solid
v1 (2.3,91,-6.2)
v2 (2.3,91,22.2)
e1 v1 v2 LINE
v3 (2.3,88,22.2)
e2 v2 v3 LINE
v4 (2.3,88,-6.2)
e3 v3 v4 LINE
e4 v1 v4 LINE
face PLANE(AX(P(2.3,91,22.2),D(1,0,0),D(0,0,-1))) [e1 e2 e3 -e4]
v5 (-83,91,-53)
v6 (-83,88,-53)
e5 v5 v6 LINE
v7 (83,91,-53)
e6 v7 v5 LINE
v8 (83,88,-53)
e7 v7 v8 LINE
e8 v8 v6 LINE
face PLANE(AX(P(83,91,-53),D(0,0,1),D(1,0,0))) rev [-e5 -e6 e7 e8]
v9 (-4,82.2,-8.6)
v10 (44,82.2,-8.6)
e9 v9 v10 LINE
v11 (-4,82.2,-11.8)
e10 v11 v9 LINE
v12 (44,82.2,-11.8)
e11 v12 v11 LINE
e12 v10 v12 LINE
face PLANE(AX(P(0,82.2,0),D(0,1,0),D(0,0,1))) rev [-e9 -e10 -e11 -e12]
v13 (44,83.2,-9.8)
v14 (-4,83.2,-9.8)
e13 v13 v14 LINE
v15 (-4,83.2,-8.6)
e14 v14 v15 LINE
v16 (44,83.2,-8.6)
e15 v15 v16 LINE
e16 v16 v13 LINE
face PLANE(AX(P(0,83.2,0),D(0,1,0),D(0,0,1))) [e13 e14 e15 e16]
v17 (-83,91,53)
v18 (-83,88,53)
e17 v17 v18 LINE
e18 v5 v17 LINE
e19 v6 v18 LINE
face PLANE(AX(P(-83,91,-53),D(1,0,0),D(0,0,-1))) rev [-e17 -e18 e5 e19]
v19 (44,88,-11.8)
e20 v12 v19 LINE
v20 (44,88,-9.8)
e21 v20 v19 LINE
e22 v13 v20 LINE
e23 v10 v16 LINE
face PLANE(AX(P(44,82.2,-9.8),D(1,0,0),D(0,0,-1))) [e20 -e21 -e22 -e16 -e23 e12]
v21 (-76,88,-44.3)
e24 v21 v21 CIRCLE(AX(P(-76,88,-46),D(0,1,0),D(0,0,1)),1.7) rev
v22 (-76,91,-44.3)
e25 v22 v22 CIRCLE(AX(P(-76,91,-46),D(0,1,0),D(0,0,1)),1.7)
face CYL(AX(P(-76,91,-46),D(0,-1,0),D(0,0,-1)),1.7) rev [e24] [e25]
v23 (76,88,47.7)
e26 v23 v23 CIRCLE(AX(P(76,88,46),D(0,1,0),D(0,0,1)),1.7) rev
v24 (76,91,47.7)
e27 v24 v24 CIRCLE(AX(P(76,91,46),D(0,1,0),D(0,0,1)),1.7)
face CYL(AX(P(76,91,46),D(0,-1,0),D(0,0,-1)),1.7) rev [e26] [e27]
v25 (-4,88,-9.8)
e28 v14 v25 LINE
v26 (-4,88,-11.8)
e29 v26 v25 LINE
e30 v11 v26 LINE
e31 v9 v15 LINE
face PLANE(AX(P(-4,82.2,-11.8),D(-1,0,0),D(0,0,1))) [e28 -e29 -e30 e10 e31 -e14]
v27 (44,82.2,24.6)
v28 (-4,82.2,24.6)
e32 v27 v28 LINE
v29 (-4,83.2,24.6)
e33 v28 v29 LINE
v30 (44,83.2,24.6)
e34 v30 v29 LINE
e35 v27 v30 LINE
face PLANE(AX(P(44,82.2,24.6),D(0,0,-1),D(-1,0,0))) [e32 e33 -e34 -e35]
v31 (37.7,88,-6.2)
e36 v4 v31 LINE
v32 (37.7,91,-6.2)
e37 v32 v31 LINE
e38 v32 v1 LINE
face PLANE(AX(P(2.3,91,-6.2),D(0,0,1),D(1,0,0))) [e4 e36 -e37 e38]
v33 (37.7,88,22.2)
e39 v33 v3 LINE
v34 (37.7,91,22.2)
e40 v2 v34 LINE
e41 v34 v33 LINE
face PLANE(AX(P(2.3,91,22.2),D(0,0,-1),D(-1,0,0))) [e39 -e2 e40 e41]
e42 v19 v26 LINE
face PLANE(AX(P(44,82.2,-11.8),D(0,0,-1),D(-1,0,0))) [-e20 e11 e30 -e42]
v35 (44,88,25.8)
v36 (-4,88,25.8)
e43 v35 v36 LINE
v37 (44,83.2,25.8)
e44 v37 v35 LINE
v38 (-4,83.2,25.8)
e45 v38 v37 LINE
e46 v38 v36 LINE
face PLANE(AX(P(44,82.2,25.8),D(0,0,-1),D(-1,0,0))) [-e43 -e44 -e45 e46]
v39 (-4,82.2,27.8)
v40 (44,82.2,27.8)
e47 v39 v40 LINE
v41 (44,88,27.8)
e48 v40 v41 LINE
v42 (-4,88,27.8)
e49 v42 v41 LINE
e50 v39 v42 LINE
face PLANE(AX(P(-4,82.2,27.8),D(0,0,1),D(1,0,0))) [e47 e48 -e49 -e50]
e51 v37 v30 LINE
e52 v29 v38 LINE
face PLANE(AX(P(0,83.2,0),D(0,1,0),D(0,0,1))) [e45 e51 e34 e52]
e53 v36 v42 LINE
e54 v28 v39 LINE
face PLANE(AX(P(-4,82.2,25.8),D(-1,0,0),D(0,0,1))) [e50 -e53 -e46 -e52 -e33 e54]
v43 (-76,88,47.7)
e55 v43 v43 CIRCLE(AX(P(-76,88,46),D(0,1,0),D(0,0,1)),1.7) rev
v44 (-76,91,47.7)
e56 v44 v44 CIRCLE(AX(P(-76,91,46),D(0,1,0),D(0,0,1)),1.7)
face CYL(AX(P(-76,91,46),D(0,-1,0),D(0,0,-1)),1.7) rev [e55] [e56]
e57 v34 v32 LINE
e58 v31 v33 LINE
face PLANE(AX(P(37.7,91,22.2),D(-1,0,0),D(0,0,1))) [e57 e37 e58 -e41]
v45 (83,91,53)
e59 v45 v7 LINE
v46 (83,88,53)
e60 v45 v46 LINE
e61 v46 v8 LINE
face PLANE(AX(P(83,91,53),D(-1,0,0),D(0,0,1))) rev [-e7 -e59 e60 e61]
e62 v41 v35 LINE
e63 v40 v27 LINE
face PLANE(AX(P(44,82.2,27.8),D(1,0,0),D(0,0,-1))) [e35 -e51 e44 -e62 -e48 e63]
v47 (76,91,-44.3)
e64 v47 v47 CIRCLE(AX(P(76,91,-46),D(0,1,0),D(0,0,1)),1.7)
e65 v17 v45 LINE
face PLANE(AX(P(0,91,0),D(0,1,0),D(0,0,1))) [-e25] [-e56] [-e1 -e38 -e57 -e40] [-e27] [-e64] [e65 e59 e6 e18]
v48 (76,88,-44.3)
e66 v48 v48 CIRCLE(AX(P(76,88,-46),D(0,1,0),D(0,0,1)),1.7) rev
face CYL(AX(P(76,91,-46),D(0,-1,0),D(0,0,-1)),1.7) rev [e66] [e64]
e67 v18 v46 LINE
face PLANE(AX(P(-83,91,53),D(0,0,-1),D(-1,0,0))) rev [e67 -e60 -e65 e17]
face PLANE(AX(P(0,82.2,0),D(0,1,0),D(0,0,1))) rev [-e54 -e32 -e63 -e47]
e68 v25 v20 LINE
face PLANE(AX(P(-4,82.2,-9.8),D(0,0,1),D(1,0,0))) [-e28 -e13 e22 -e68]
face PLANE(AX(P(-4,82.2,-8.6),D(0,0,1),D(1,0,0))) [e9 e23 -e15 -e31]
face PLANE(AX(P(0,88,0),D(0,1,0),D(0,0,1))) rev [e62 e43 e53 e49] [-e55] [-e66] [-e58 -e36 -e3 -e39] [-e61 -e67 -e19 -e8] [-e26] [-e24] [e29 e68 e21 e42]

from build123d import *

# Parameters (mm, degrees)
LID_PLATE_START               = 88
SKETCH1_W                     = 166
SKETCH1_H                     = 106
LID_PLATE_DEPTH               = 3
TFT_WINDOW_DEPTH              = 135.085793431
TFT_WINDOW_DEPTH_BACK         = 135.085793431
SKETCH2_W                     = 35.4
SKETCH2_H                     = 28.4
LID_SCREW_HOLES_M3_DEPTH      = 135.085793431
LID_SCREW_HOLES_M3_DEPTH_BACK = 135.085793431
SKETCH3_R                     = 1.7
TFT_RAILS_START               = 88
SKETCH4_W                     = 48
SKETCH4_H                     = 2
TFT_RAILS_DEPTH               = 5.8
TFT_RAIL_LIPS_START           = 83.2
SKETCH5_W                     = 48
SKETCH5_H                     = 1.2
TFT_RAIL_LIPS_DEPTH           = 1


with BuildPart() as part:
    # Sketch1 → Lid_Plate (new body)
    with BuildSketch(Plane(origin=(0, 0, 0), x_dir=(1, 0, 0), z_dir=(0, 1, 0)).offset(LID_PLATE_START)):
        Rectangle(SKETCH1_W, SKETCH1_H)
    extrude(amount=LID_PLATE_DEPTH)

    # Sketch2 → TFT_Window (cut, two sides: drawn at the far end of the back side and taken through both)
    with BuildSketch(Plane(origin=(0, 0, 0), x_dir=(1, 0, 0), z_dir=(0, 1, 0)).offset(-TFT_WINDOW_DEPTH_BACK)):
        with Locations((20, -8)):
            Rectangle(SKETCH2_W, SKETCH2_H)
    extrude(amount=TFT_WINDOW_DEPTH + TFT_WINDOW_DEPTH_BACK, mode=Mode.SUBTRACT)

    # Sketch3 → Lid_Screw_Holes_M3 (cut, two sides: drawn at the far end of the back side and taken through both)
    with BuildSketch(Plane(origin=(0, 0, 0), x_dir=(1, 0, 0), z_dir=(0, 1, 0)).offset(-LID_SCREW_HOLES_M3_DEPTH_BACK)):
        with Locations((-76, 46)):
            Circle(SKETCH3_R)
        with Locations((-76, -46)):
            Circle(SKETCH3_R)
        with Locations((76, 46)):
            Circle(SKETCH3_R)
        with Locations((76, -46)):
            Circle(SKETCH3_R)
    extrude(amount=LID_SCREW_HOLES_M3_DEPTH + LID_SCREW_HOLES_M3_DEPTH_BACK, mode=Mode.SUBTRACT)

    # Sketch4 → TFT_Rails (add)
    with BuildSketch(Plane(origin=(0, 0, 0), x_dir=(1, 0, 0), z_dir=(0, 1, 0)).offset(TFT_RAILS_START)):
        with Locations((20, 10.8)):
            Rectangle(SKETCH4_W, SKETCH4_H)
        with Locations((20, -26.8)):
            Rectangle(SKETCH4_W, SKETCH4_H)
    extrude(amount=-TFT_RAILS_DEPTH)

    # Sketch5 → TFT_Rail_Lips (add)
    with BuildSketch(Plane(origin=(0, 0, 0), x_dir=(1, 0, 0), z_dir=(0, 1, 0)).offset(TFT_RAIL_LIPS_START)):
        with Locations((20, 9.2)):
            Rectangle(SKETCH5_W, SKETCH5_H)
        with Locations((20, -25.2)):
            Rectangle(SKETCH5_W, SKETCH5_H)
    extrude(amount=-TFT_RAIL_LIPS_DEPTH)


solid = part.part
